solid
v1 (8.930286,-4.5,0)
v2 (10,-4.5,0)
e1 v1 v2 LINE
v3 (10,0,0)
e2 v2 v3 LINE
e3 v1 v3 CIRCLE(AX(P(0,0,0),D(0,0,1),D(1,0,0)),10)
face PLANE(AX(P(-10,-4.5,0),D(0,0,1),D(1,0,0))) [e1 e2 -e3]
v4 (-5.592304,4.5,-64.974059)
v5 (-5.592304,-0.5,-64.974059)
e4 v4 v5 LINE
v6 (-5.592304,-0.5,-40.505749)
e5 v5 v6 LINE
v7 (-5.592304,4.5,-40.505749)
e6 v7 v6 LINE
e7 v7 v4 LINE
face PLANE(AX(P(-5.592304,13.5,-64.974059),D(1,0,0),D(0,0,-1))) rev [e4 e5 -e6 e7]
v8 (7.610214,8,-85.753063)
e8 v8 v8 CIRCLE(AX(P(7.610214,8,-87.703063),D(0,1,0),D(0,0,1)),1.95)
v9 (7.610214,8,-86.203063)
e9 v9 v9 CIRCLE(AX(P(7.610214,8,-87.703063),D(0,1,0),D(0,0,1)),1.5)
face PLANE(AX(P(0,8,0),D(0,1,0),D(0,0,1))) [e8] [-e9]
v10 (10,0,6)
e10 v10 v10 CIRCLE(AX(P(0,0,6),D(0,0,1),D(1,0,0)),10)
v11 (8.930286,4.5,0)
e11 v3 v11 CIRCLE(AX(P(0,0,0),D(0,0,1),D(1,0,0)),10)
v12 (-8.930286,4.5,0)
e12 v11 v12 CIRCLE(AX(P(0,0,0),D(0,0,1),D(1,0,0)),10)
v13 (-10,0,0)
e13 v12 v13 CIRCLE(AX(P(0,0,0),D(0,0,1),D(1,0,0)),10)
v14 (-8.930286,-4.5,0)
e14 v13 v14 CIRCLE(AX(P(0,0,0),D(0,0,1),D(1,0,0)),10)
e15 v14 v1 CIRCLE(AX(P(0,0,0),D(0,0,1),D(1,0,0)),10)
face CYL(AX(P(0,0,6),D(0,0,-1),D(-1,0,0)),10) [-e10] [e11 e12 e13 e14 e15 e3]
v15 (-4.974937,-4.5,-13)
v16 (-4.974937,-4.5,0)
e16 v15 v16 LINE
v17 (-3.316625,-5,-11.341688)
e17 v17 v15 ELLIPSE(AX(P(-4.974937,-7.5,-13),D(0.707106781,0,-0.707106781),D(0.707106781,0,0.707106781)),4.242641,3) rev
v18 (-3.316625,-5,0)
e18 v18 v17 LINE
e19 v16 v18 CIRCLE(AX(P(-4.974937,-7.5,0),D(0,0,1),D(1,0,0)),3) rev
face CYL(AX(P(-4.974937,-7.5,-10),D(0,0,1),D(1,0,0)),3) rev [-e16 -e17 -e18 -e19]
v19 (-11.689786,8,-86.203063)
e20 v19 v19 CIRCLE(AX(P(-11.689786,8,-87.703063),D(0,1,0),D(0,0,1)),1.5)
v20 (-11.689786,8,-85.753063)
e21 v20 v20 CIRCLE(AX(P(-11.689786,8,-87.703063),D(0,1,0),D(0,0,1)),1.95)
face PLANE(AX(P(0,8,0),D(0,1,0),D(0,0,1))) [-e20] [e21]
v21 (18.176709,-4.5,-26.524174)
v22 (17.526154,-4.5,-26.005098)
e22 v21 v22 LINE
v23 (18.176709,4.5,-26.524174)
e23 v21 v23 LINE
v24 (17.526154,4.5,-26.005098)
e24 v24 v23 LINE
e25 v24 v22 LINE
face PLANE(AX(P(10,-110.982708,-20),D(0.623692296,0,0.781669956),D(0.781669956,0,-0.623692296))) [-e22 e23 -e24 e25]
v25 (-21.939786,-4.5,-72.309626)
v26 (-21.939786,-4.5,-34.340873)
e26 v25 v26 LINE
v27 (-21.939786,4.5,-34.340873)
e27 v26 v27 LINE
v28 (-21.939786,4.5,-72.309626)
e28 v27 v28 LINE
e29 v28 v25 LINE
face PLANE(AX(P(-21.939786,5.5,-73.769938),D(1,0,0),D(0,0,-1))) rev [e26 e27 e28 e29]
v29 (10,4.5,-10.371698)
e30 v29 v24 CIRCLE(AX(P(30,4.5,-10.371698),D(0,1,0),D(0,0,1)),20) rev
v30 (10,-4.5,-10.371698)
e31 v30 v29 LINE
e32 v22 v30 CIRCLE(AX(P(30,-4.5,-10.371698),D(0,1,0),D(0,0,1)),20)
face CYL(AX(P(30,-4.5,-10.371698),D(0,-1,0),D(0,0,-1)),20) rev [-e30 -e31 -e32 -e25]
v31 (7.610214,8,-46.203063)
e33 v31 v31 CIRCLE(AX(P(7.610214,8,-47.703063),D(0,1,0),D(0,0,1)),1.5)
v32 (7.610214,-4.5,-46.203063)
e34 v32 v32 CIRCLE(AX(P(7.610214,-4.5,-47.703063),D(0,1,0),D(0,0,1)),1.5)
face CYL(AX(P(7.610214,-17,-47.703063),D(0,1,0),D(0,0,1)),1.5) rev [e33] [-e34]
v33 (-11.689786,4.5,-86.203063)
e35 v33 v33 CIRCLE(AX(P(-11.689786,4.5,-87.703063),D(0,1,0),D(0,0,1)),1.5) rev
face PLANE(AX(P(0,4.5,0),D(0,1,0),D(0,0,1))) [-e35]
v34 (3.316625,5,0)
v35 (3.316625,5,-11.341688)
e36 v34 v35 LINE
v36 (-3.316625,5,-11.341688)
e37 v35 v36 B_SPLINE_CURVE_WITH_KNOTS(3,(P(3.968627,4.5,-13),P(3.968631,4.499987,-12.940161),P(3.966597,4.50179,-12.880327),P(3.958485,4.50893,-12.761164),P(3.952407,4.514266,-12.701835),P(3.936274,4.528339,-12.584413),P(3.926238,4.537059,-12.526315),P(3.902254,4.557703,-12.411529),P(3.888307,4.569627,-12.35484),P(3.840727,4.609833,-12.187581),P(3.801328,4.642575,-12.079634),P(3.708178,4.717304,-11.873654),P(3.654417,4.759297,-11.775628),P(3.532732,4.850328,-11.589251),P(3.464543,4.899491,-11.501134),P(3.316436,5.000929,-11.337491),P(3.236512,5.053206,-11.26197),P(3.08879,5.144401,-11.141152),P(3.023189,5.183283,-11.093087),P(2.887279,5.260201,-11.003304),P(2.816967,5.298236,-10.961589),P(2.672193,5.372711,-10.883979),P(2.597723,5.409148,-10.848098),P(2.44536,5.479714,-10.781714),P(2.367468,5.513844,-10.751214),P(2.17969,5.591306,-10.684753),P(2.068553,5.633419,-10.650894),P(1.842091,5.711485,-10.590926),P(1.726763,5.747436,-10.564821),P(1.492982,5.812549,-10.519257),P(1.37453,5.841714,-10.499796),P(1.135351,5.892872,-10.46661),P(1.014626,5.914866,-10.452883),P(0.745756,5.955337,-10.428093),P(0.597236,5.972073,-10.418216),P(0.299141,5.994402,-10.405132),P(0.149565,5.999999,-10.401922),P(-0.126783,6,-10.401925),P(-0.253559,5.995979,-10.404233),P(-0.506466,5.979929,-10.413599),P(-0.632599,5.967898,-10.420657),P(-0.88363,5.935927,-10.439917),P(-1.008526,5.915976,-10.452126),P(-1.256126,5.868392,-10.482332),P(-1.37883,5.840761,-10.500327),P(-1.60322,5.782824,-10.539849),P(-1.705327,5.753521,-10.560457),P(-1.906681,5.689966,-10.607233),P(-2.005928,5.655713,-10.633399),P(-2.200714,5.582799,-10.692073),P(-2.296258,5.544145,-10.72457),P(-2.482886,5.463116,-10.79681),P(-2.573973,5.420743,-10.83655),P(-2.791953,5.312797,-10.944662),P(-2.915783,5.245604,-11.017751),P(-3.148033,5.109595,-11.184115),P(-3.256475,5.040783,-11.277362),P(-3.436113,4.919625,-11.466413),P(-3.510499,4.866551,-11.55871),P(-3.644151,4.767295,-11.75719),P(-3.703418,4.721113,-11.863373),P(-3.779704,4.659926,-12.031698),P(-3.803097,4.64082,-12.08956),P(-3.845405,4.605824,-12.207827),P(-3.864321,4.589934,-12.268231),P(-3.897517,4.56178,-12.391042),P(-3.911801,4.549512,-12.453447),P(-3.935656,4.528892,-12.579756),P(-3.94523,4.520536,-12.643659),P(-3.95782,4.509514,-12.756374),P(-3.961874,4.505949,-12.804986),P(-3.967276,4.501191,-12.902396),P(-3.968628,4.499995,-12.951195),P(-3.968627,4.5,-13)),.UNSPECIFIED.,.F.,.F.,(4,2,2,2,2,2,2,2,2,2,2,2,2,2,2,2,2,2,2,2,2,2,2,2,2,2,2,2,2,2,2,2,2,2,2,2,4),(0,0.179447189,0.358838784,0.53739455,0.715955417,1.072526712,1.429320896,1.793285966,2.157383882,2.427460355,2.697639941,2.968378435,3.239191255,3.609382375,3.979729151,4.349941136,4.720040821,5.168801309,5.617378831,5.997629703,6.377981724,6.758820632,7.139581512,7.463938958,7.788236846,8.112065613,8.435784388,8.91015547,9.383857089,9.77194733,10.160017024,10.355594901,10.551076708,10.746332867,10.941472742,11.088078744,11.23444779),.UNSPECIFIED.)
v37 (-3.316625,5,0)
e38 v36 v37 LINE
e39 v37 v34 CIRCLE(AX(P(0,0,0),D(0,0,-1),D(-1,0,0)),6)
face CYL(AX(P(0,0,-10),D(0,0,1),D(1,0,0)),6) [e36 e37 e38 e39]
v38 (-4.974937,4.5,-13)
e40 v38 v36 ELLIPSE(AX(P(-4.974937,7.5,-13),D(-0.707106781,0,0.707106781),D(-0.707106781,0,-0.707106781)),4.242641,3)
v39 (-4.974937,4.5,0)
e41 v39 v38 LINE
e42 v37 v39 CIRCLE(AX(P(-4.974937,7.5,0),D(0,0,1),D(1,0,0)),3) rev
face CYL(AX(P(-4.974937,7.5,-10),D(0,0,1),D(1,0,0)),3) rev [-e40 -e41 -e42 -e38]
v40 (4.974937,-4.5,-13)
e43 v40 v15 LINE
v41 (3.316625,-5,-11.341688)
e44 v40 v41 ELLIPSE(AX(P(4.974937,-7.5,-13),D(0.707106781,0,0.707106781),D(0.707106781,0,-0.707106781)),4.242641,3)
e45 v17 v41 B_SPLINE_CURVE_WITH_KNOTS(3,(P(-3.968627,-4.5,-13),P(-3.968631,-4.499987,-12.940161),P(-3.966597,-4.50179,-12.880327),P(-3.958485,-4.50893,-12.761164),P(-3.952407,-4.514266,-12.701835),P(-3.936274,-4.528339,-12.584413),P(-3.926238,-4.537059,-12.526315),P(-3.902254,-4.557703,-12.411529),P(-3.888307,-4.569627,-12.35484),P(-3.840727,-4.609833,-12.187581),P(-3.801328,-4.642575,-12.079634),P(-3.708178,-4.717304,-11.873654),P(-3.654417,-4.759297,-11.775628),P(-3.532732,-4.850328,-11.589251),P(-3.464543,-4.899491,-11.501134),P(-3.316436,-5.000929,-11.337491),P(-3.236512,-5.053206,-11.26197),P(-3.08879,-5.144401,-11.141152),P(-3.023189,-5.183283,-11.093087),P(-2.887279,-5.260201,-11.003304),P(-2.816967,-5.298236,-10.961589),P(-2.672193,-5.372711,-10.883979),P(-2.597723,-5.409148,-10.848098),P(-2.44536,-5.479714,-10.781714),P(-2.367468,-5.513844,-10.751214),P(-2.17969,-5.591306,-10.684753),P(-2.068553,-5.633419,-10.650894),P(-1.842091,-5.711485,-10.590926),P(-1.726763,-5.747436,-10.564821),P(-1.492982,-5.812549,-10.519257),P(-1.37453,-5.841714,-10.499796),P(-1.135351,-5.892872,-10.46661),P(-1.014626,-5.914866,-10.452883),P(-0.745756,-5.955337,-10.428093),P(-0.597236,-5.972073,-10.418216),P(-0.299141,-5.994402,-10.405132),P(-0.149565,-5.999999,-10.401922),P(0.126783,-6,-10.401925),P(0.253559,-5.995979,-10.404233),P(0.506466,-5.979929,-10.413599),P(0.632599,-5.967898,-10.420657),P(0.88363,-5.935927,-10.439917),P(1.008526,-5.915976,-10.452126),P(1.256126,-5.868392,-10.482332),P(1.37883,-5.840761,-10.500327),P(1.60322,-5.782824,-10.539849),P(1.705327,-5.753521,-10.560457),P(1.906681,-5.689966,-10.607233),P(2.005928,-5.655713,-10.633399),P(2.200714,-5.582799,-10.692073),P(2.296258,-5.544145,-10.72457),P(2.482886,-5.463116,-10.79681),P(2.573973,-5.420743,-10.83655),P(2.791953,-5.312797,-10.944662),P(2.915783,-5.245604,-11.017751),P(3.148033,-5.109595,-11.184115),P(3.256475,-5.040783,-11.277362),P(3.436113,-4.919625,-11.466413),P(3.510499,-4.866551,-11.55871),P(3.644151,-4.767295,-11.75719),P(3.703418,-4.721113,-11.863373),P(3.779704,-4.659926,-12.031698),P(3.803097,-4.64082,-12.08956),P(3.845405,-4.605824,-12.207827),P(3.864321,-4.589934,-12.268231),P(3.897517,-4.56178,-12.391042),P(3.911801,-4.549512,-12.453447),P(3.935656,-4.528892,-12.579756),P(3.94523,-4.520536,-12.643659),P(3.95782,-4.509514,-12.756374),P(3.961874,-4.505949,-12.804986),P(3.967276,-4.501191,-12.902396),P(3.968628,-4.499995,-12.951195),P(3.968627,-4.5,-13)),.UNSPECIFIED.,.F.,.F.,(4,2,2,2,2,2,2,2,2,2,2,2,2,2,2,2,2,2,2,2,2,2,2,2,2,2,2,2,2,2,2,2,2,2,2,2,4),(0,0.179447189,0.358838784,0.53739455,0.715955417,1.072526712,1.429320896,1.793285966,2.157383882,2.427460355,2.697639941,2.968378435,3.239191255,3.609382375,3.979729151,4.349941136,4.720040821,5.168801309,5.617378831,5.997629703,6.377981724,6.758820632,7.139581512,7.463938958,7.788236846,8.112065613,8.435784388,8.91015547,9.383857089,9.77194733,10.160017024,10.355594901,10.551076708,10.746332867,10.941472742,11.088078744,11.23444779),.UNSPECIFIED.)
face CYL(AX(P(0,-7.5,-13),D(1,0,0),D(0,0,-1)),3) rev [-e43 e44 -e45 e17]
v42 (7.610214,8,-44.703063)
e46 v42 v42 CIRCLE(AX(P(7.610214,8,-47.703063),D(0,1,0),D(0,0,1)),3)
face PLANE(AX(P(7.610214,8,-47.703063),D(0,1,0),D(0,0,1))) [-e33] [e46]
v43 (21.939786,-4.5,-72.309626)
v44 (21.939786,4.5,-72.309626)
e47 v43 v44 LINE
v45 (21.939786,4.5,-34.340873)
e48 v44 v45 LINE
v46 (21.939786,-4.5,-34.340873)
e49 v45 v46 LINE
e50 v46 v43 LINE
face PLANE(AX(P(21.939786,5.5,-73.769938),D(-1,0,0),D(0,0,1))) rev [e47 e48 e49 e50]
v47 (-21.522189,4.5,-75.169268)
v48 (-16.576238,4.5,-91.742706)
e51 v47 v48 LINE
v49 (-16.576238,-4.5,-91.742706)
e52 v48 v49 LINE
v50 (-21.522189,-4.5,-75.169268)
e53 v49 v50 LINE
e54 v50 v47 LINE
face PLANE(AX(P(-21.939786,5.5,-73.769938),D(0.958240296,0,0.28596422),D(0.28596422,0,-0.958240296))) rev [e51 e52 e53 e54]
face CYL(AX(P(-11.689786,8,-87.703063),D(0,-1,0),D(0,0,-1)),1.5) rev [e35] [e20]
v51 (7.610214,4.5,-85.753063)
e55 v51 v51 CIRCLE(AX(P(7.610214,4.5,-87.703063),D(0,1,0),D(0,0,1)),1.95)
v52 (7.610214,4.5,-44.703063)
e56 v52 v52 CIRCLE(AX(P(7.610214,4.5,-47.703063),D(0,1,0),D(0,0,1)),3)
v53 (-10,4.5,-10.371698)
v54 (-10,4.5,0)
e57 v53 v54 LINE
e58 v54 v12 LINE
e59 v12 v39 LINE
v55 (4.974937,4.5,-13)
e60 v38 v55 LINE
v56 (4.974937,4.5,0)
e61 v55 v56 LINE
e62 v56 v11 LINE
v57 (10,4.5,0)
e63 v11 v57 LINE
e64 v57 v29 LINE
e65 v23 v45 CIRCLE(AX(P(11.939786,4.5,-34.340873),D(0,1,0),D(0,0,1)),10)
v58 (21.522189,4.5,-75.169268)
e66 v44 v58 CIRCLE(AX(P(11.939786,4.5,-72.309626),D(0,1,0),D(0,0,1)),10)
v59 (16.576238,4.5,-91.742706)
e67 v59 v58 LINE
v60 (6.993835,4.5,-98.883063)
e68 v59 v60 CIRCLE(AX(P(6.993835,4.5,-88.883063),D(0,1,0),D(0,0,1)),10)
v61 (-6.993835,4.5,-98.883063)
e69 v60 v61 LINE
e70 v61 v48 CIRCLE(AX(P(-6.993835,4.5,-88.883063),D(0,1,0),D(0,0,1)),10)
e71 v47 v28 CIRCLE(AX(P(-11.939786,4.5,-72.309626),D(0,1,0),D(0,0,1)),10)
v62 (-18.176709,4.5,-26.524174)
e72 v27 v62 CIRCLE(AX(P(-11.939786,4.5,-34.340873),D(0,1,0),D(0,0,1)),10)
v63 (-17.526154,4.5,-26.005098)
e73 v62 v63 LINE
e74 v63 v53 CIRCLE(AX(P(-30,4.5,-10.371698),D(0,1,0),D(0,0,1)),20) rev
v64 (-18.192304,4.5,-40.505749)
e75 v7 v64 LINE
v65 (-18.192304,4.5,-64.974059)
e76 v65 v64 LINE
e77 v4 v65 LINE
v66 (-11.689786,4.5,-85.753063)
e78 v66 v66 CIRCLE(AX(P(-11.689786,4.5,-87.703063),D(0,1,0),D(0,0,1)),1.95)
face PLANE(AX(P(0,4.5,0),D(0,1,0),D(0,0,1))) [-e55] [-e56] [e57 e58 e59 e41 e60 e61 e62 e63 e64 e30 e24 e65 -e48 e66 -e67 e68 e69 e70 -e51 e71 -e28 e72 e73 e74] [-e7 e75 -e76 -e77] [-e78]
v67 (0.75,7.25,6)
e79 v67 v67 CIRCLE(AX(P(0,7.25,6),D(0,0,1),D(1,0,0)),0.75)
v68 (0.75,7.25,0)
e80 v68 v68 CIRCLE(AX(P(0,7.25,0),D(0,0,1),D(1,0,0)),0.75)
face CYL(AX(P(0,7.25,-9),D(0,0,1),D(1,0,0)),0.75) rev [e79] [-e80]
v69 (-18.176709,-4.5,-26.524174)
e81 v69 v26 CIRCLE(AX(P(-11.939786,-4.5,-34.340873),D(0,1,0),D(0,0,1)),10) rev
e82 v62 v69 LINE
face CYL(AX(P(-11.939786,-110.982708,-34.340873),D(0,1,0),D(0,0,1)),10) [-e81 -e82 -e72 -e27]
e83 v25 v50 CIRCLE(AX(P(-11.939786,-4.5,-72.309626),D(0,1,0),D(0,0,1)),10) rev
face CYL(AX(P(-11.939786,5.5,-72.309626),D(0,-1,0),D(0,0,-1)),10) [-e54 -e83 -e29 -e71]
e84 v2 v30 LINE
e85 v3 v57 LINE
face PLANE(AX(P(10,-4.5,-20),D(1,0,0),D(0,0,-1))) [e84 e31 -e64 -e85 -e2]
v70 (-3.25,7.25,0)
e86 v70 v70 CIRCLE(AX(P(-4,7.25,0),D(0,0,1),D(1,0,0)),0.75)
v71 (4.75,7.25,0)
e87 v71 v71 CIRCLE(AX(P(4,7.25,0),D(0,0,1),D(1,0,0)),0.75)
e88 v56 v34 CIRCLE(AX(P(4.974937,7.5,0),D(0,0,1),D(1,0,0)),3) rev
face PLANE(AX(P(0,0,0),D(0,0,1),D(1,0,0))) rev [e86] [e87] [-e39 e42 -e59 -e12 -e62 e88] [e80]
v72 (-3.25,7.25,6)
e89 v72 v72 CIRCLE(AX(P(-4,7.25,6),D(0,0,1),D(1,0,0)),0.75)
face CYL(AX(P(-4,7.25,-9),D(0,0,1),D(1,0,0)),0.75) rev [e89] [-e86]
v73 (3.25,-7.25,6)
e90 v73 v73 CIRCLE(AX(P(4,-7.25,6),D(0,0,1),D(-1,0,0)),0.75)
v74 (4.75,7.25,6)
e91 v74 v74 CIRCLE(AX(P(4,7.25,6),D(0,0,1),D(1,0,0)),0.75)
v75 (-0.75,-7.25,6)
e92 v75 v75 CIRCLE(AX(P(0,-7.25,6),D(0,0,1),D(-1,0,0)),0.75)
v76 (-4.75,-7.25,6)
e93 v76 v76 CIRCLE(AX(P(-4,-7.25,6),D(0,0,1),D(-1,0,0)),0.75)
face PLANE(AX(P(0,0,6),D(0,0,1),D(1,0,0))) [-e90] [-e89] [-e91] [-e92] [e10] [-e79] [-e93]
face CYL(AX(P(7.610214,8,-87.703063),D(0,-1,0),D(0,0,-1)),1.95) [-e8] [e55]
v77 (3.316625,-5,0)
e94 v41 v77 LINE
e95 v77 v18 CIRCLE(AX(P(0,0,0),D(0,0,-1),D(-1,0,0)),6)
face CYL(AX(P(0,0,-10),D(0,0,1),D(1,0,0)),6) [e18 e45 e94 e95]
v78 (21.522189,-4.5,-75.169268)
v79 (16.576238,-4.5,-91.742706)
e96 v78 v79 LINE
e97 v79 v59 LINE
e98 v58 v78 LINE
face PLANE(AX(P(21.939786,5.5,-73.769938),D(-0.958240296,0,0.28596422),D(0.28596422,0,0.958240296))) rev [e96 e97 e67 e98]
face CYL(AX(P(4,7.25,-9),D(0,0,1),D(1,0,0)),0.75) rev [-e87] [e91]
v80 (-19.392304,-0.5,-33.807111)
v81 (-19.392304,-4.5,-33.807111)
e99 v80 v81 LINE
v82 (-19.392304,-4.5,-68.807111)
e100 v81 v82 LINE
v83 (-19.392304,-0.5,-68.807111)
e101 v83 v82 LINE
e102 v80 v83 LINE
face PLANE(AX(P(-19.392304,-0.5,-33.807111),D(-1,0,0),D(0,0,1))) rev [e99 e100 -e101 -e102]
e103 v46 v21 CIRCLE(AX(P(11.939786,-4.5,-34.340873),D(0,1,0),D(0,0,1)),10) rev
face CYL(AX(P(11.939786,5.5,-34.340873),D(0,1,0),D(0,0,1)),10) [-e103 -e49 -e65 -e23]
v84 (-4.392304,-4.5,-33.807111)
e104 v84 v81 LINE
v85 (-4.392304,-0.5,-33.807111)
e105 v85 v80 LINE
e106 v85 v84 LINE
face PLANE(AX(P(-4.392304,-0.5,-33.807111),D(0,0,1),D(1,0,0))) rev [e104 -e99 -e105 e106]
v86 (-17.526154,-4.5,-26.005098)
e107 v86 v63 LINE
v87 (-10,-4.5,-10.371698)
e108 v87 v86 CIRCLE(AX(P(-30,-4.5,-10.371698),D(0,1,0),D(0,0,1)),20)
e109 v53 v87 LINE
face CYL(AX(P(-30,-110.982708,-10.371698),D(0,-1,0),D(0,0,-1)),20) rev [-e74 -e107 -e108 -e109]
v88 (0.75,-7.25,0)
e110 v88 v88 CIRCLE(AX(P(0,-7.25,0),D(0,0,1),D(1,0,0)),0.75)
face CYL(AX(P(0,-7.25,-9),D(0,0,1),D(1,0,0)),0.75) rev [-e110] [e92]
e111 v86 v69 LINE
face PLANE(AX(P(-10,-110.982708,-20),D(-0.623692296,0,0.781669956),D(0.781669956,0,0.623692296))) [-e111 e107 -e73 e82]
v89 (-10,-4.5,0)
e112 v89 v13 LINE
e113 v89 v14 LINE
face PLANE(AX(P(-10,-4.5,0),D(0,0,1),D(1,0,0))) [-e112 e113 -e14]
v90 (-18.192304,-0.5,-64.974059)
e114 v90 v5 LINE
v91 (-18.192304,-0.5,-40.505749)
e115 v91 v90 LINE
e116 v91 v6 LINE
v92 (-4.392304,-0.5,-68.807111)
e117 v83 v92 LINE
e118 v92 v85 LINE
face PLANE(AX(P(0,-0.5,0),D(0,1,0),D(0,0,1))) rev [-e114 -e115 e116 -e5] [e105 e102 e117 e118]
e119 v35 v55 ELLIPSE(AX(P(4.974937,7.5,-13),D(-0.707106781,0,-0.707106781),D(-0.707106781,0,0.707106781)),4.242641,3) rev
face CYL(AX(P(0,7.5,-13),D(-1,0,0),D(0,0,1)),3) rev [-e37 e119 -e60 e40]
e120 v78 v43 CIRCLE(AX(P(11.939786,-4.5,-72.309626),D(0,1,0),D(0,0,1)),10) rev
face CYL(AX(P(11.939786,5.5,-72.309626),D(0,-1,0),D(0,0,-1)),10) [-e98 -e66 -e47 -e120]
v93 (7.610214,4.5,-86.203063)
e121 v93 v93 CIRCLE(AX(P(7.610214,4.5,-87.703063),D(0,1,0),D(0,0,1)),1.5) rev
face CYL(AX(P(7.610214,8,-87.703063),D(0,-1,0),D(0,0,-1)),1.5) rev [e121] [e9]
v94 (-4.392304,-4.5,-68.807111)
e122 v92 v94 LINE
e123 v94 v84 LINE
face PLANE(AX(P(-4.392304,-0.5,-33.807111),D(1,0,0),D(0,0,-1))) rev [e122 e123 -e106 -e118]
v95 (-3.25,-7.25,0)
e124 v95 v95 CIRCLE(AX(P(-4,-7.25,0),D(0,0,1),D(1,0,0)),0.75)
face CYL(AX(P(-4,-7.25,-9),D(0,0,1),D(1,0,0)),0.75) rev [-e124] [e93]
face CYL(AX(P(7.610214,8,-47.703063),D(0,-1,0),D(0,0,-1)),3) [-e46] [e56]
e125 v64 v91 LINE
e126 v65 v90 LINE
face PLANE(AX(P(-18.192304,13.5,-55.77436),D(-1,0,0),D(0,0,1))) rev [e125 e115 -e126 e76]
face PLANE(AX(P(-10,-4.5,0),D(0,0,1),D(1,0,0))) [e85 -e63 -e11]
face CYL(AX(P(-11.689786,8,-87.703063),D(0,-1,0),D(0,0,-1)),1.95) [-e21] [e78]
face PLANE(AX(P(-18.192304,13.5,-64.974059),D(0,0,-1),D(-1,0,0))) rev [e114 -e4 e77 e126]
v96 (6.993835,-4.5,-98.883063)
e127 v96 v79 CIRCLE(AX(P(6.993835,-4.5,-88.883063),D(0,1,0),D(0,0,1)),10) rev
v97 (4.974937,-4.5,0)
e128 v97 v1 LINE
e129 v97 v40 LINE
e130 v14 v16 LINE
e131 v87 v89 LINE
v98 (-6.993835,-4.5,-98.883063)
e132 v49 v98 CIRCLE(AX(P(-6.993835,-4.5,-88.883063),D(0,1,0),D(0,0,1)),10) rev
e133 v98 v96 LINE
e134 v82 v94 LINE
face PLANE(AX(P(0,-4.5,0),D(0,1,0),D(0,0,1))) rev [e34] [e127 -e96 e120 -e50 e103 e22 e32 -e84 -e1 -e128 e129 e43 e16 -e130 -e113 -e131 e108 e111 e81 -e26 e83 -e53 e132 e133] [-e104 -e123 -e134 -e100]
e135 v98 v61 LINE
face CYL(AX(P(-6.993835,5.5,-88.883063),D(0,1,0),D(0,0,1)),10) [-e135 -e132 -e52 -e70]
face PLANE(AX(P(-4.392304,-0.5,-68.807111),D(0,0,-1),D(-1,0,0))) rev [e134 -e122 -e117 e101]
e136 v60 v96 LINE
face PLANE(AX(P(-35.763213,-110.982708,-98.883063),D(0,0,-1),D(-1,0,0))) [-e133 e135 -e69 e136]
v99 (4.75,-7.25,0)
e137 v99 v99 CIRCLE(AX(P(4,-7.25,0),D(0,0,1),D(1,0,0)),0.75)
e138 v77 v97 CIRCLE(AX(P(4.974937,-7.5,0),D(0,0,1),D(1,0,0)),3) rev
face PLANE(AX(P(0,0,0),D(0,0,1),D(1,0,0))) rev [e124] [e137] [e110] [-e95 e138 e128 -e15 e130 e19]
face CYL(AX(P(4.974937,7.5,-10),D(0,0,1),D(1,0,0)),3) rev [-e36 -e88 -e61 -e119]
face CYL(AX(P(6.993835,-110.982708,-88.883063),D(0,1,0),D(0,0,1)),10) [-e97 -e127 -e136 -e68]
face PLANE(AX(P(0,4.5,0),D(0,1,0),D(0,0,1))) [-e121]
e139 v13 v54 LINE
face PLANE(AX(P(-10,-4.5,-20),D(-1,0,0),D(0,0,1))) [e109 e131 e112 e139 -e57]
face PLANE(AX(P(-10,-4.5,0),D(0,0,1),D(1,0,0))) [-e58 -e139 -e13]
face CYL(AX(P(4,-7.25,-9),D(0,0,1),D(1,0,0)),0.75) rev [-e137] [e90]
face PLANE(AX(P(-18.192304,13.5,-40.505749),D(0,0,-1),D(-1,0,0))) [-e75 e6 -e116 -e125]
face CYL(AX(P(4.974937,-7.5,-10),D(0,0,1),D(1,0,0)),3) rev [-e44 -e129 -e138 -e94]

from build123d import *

# Parameters (mm, degrees)
SKETCH1_R           = 10
BOSS_EXTRUDE1_DEPTH = 6
SKETCH2_R           = 0.75
CUT_EXTRUDE1_DEPTH  = 15
SKETCH4_R           = 6
BOSS_EXTRUDE3_DEPTH = 10
SKETCH5_W           = 20
SKETCH5_H           = 20
BOSS_EXTRUDE4_DEPTH = 4.5
BOSS_EXTRUDE5_DEPTH = 9
SKETCH7_W           = 15
SKETCH7_H           = 35
CUT_EXTRUDE2_DEPTH  = 4
CUT_EXTRUDE3_DEPTH  = 14
CUT_EXTRUDE4_DEPTH  = 10
SKETCH11_R          = 1.95
SKETCH11_R_2        = 1.5
BOSS_EXTRUDE6_DEPTH = 3.5
SKETCH12_R          = 3
BOSS_EXTRUDE7_DEPTH = 3.5
SKETCH13_R          = 1.5
CUT_EXTRUDE5_DEPTH  = 25
FILLET1_R           = 20
FILLET2_R           = 10
FILLET3_R           = 3
FILLET4_R           = 3
FILLET5_R           = 3
FILLET6_R           = 3


with BuildPart() as part:
    # Sketch1 → Boss-Extrude1 (new body)
    with BuildSketch(Plane.XY):
        Circle(SKETCH1_R)
    extrude(amount=BOSS_EXTRUDE1_DEPTH)

    # Sketch2 → Cut-Extrude1 (cut)
    with BuildSketch(Plane.XY.offset(6)):
        with Locations((0, 7.25)):
            Circle(SKETCH2_R)
        with Locations((4, 7.25)):
            Circle(SKETCH2_R)
        with Locations((-4, 7.25)):
            Circle(SKETCH2_R)
        with Locations((4, -7.25)):
            Circle(SKETCH2_R)
        with Locations((0, -7.25)):
            Circle(SKETCH2_R)
        with Locations((-4, -7.25)):
            Circle(SKETCH2_R)
    extrude(amount=-CUT_EXTRUDE1_DEPTH, mode=Mode.SUBTRACT)

    # Sketch4 → Boss-Extrude3 (add)
    with BuildSketch(Plane(origin=(0, 0, 0), x_dir=(-1, 0, 0), z_dir=(0, 0, -1))):
        Circle(SKETCH4_R)
    extrude(amount=BOSS_EXTRUDE3_DEPTH)

    # Sketch5 → Boss-Extrude4 (add, symmetric)
    with BuildSketch(Plane(origin=(0, 0, 0), x_dir=(1, 0, 0), z_dir=(0, 1, 0))):
        with Locations((0, 10)):
            Rectangle(SKETCH5_W, SKETCH5_H)
    extrude(amount=BOSS_EXTRUDE4_DEPTH, both=True)

    # Sketch6 → Boss-Extrude5 (add)
    with BuildSketch(Plane(origin=(0, 4.5, 0), x_dir=(1, 0, 0), z_dir=(0, 1, 0))):
        Polygon((10, 20), (35.763212592, 40.556396064), (35.763212592, 98.883063355), (-35.763212592, 98.883063355), (-35.763212592, 40.556396064), (-10, 20), align=None)
    extrude(amount=-BOSS_EXTRUDE5_DEPTH)

    # Sketch7 → Cut-Extrude2 (cut)
    with BuildSketch(Plane.XZ.offset(4.5)):
        with Locations((-11.892304399, -51.30711123)):
            Rectangle(SKETCH7_W, SKETCH7_H)
    extrude(amount=-CUT_EXTRUDE2_DEPTH, mode=Mode.SUBTRACT)

    # Sketch8 → Cut-Extrude3 (cut)
    with BuildSketch(Plane.XZ.offset(0.5)):
        Polygon((-18.192304399, -55.774359721), (-18.192304399, -40.505749007), (-5.592304399, -40.505749007), (-5.592304399, -55.774359721), (-5.592304399, -64.974058921), (-18.192304399, -64.974058921), align=None)
    extrude(amount=-CUT_EXTRUDE3_DEPTH, mode=Mode.SUBTRACT)

    # Sketch10 → Cut-Extrude4 (cut)
    with BuildSketch(Plane.XZ.offset(4.5)):
        Polygon((-21.939786422, -73.769938093), (-14.445366372, -98.883063355), (-35.763212592, -98.883063355), (-35.763212592, -40.556396064), (-21.939786422, -29.526722559), align=None)
        Polygon((35.763212592, -40.556396064), (35.763212592, -98.883063355), (14.445366372, -98.883063355), (21.939786422, -73.769938093), (21.939786422, -29.526722559), align=None)
    extrude(amount=-CUT_EXTRUDE4_DEPTH, mode=Mode.SUBTRACT)

    # Sketch11 → Boss-Extrude6 (add)
    # profile 1 of 2: a face of its own
    with BuildSketch(Plane(origin=(0, 4.5, 0), x_dir=(1, 0, 0), z_dir=(0, 1, 0))):
        with Locations(Location((-11.689786422, 87.703063355, 0), (0, 0, 270))):
            Circle(SKETCH11_R)
        with Locations(Location((-11.689786422, 87.703063355, 0), (0, 0, 270))):
            Circle(SKETCH11_R_2, mode=Mode.SUBTRACT)
    # profile 2 of 2: a face of its own
    with BuildSketch(Plane(origin=(0, 4.5, 0), x_dir=(1, 0, 0), z_dir=(0, 1, 0))):
        with Locations(Location((7.610213578, 87.703063355, 0), (0, 0, 270))):
            Circle(SKETCH11_R)
        with Locations(Location((7.610213578, 87.703063355, 0), (0, 0, 270))):
            Circle(SKETCH11_R_2, mode=Mode.SUBTRACT)
    extrude(amount=BOSS_EXTRUDE6_DEPTH)

    # Sketch12 → Boss-Extrude7 (add)
    with BuildSketch(Plane(origin=(0, 4.5, 0), x_dir=(1, 0, 0), z_dir=(0, 1, 0))):
        with Locations(Location((7.610213578, 47.703063355, 0), (0, 0, 270))):
            Circle(SKETCH12_R)
    extrude(amount=BOSS_EXTRUDE7_DEPTH)

    # Sketch13 → Cut-Extrude5 (cut)
    with BuildSketch(Plane(origin=(0, 8, 0), x_dir=(1, 0, 0), z_dir=(0, 1, 0))):
        with Locations(Location((7.610213578, 47.703063355, 0), (0, 0, 270))):
            Circle(SKETCH13_R)
    extrude(amount=-CUT_EXTRUDE5_DEPTH, mode=Mode.SUBTRACT)

    # Fillet1
    fillet1_edges = [part.edges().sort_by_distance(p)[0] for p in [
        (10, 0, -20),
        (-10, 0, -20),
    ]]
    fillet(fillet1_edges, radius=FILLET1_R)

    # Fillet2
    fillet2_edges = [part.edges().sort_by_distance(p)[0] for p in [
        (-21.939786422, 0, -29.526722559),
        (-21.939786422, 0, -73.769938093),
        (-14.445366372, 0, -98.883063355),
        (21.939786422, 0, -29.526722559),
        (14.445366372, 0, -98.883063355),
        (21.939786422, 0, -73.769938093),
    ]]
    fillet(fillet2_edges, radius=FILLET2_R)

    # Fillet3
    # the kernel refuses this fillet: 3 mm, written as the material it adds along each edge
    with BuildSketch(Plane(origin=(11.468626967, 4.5, -10), x_dir=(0, 0, -1), z_dir=(-1, 0, 0))) as fillet3_piece_1_section:
        with BuildLine():
            CenterArc((FILLET3_R, -FILLET3_R), FILLET3_R, 90, 90)
            Line((0, -FILLET3_R), (0, 0))
            Line((0, 0), (FILLET3_R, 0))
        make_face()
    fillet3_piece_1 = extrude(amount=22.937253933, mode=Mode.PRIVATE)
    fillet3_piece_1 = fillet3_piece_1 & Plane(origin=(0, 0, -10.801783603), x_dir=(-1, 0, 0), z_dir=(0, 0, 1)) * Cylinder(6, 58, mode=Mode.PRIVATE)
    add(fillet3_piece_1)
    with BuildSketch(Plane(origin=(11.468626967, -4.5, -10), x_dir=(0, 0, -1), z_dir=(-1, 0, 0))) as fillet3_piece_2_section:
        with BuildLine():
            CenterArc((FILLET3_R, FILLET3_R), FILLET3_R, 180, 90)
            Line((0, FILLET3_R), (0, 0))
            Line((0, 0), (FILLET3_R, 0))
        make_face()
    fillet3_piece_2 = extrude(amount=22.937253933, mode=Mode.PRIVATE)
    fillet3_piece_2 = fillet3_piece_2 & Plane(origin=(0, 0, -10.801783603), x_dir=(-1, 0, 0), z_dir=(0, 0, 1)) * Cylinder(6, 58, mode=Mode.PRIVATE)
    add(fillet3_piece_2)

    # Fillet4
    fillet4_edges = [part.edges().sort_by_distance(p)[0] for p in [
        (3.968626967, 4.5, -6.5),
    ]]
    fillet(fillet4_edges, radius=FILLET4_R)

    # Fillet5
    fillet5_edges = [part.edges().sort_by_distance(p)[0] for p in [
        (-3.968626967, 4.5, -6.5),
    ]]
    fillet(fillet5_edges, radius=FILLET5_R)

    # Fillet6
    fillet6_edges = [part.edges().sort_by_distance(p)[0] for p in [
        (-3.968626967, -4.5, -6.5),
        (3.968626967, -4.5, -6.5),
    ]]
    fillet(fillet6_edges, radius=FILLET6_R)


solid = part.part
